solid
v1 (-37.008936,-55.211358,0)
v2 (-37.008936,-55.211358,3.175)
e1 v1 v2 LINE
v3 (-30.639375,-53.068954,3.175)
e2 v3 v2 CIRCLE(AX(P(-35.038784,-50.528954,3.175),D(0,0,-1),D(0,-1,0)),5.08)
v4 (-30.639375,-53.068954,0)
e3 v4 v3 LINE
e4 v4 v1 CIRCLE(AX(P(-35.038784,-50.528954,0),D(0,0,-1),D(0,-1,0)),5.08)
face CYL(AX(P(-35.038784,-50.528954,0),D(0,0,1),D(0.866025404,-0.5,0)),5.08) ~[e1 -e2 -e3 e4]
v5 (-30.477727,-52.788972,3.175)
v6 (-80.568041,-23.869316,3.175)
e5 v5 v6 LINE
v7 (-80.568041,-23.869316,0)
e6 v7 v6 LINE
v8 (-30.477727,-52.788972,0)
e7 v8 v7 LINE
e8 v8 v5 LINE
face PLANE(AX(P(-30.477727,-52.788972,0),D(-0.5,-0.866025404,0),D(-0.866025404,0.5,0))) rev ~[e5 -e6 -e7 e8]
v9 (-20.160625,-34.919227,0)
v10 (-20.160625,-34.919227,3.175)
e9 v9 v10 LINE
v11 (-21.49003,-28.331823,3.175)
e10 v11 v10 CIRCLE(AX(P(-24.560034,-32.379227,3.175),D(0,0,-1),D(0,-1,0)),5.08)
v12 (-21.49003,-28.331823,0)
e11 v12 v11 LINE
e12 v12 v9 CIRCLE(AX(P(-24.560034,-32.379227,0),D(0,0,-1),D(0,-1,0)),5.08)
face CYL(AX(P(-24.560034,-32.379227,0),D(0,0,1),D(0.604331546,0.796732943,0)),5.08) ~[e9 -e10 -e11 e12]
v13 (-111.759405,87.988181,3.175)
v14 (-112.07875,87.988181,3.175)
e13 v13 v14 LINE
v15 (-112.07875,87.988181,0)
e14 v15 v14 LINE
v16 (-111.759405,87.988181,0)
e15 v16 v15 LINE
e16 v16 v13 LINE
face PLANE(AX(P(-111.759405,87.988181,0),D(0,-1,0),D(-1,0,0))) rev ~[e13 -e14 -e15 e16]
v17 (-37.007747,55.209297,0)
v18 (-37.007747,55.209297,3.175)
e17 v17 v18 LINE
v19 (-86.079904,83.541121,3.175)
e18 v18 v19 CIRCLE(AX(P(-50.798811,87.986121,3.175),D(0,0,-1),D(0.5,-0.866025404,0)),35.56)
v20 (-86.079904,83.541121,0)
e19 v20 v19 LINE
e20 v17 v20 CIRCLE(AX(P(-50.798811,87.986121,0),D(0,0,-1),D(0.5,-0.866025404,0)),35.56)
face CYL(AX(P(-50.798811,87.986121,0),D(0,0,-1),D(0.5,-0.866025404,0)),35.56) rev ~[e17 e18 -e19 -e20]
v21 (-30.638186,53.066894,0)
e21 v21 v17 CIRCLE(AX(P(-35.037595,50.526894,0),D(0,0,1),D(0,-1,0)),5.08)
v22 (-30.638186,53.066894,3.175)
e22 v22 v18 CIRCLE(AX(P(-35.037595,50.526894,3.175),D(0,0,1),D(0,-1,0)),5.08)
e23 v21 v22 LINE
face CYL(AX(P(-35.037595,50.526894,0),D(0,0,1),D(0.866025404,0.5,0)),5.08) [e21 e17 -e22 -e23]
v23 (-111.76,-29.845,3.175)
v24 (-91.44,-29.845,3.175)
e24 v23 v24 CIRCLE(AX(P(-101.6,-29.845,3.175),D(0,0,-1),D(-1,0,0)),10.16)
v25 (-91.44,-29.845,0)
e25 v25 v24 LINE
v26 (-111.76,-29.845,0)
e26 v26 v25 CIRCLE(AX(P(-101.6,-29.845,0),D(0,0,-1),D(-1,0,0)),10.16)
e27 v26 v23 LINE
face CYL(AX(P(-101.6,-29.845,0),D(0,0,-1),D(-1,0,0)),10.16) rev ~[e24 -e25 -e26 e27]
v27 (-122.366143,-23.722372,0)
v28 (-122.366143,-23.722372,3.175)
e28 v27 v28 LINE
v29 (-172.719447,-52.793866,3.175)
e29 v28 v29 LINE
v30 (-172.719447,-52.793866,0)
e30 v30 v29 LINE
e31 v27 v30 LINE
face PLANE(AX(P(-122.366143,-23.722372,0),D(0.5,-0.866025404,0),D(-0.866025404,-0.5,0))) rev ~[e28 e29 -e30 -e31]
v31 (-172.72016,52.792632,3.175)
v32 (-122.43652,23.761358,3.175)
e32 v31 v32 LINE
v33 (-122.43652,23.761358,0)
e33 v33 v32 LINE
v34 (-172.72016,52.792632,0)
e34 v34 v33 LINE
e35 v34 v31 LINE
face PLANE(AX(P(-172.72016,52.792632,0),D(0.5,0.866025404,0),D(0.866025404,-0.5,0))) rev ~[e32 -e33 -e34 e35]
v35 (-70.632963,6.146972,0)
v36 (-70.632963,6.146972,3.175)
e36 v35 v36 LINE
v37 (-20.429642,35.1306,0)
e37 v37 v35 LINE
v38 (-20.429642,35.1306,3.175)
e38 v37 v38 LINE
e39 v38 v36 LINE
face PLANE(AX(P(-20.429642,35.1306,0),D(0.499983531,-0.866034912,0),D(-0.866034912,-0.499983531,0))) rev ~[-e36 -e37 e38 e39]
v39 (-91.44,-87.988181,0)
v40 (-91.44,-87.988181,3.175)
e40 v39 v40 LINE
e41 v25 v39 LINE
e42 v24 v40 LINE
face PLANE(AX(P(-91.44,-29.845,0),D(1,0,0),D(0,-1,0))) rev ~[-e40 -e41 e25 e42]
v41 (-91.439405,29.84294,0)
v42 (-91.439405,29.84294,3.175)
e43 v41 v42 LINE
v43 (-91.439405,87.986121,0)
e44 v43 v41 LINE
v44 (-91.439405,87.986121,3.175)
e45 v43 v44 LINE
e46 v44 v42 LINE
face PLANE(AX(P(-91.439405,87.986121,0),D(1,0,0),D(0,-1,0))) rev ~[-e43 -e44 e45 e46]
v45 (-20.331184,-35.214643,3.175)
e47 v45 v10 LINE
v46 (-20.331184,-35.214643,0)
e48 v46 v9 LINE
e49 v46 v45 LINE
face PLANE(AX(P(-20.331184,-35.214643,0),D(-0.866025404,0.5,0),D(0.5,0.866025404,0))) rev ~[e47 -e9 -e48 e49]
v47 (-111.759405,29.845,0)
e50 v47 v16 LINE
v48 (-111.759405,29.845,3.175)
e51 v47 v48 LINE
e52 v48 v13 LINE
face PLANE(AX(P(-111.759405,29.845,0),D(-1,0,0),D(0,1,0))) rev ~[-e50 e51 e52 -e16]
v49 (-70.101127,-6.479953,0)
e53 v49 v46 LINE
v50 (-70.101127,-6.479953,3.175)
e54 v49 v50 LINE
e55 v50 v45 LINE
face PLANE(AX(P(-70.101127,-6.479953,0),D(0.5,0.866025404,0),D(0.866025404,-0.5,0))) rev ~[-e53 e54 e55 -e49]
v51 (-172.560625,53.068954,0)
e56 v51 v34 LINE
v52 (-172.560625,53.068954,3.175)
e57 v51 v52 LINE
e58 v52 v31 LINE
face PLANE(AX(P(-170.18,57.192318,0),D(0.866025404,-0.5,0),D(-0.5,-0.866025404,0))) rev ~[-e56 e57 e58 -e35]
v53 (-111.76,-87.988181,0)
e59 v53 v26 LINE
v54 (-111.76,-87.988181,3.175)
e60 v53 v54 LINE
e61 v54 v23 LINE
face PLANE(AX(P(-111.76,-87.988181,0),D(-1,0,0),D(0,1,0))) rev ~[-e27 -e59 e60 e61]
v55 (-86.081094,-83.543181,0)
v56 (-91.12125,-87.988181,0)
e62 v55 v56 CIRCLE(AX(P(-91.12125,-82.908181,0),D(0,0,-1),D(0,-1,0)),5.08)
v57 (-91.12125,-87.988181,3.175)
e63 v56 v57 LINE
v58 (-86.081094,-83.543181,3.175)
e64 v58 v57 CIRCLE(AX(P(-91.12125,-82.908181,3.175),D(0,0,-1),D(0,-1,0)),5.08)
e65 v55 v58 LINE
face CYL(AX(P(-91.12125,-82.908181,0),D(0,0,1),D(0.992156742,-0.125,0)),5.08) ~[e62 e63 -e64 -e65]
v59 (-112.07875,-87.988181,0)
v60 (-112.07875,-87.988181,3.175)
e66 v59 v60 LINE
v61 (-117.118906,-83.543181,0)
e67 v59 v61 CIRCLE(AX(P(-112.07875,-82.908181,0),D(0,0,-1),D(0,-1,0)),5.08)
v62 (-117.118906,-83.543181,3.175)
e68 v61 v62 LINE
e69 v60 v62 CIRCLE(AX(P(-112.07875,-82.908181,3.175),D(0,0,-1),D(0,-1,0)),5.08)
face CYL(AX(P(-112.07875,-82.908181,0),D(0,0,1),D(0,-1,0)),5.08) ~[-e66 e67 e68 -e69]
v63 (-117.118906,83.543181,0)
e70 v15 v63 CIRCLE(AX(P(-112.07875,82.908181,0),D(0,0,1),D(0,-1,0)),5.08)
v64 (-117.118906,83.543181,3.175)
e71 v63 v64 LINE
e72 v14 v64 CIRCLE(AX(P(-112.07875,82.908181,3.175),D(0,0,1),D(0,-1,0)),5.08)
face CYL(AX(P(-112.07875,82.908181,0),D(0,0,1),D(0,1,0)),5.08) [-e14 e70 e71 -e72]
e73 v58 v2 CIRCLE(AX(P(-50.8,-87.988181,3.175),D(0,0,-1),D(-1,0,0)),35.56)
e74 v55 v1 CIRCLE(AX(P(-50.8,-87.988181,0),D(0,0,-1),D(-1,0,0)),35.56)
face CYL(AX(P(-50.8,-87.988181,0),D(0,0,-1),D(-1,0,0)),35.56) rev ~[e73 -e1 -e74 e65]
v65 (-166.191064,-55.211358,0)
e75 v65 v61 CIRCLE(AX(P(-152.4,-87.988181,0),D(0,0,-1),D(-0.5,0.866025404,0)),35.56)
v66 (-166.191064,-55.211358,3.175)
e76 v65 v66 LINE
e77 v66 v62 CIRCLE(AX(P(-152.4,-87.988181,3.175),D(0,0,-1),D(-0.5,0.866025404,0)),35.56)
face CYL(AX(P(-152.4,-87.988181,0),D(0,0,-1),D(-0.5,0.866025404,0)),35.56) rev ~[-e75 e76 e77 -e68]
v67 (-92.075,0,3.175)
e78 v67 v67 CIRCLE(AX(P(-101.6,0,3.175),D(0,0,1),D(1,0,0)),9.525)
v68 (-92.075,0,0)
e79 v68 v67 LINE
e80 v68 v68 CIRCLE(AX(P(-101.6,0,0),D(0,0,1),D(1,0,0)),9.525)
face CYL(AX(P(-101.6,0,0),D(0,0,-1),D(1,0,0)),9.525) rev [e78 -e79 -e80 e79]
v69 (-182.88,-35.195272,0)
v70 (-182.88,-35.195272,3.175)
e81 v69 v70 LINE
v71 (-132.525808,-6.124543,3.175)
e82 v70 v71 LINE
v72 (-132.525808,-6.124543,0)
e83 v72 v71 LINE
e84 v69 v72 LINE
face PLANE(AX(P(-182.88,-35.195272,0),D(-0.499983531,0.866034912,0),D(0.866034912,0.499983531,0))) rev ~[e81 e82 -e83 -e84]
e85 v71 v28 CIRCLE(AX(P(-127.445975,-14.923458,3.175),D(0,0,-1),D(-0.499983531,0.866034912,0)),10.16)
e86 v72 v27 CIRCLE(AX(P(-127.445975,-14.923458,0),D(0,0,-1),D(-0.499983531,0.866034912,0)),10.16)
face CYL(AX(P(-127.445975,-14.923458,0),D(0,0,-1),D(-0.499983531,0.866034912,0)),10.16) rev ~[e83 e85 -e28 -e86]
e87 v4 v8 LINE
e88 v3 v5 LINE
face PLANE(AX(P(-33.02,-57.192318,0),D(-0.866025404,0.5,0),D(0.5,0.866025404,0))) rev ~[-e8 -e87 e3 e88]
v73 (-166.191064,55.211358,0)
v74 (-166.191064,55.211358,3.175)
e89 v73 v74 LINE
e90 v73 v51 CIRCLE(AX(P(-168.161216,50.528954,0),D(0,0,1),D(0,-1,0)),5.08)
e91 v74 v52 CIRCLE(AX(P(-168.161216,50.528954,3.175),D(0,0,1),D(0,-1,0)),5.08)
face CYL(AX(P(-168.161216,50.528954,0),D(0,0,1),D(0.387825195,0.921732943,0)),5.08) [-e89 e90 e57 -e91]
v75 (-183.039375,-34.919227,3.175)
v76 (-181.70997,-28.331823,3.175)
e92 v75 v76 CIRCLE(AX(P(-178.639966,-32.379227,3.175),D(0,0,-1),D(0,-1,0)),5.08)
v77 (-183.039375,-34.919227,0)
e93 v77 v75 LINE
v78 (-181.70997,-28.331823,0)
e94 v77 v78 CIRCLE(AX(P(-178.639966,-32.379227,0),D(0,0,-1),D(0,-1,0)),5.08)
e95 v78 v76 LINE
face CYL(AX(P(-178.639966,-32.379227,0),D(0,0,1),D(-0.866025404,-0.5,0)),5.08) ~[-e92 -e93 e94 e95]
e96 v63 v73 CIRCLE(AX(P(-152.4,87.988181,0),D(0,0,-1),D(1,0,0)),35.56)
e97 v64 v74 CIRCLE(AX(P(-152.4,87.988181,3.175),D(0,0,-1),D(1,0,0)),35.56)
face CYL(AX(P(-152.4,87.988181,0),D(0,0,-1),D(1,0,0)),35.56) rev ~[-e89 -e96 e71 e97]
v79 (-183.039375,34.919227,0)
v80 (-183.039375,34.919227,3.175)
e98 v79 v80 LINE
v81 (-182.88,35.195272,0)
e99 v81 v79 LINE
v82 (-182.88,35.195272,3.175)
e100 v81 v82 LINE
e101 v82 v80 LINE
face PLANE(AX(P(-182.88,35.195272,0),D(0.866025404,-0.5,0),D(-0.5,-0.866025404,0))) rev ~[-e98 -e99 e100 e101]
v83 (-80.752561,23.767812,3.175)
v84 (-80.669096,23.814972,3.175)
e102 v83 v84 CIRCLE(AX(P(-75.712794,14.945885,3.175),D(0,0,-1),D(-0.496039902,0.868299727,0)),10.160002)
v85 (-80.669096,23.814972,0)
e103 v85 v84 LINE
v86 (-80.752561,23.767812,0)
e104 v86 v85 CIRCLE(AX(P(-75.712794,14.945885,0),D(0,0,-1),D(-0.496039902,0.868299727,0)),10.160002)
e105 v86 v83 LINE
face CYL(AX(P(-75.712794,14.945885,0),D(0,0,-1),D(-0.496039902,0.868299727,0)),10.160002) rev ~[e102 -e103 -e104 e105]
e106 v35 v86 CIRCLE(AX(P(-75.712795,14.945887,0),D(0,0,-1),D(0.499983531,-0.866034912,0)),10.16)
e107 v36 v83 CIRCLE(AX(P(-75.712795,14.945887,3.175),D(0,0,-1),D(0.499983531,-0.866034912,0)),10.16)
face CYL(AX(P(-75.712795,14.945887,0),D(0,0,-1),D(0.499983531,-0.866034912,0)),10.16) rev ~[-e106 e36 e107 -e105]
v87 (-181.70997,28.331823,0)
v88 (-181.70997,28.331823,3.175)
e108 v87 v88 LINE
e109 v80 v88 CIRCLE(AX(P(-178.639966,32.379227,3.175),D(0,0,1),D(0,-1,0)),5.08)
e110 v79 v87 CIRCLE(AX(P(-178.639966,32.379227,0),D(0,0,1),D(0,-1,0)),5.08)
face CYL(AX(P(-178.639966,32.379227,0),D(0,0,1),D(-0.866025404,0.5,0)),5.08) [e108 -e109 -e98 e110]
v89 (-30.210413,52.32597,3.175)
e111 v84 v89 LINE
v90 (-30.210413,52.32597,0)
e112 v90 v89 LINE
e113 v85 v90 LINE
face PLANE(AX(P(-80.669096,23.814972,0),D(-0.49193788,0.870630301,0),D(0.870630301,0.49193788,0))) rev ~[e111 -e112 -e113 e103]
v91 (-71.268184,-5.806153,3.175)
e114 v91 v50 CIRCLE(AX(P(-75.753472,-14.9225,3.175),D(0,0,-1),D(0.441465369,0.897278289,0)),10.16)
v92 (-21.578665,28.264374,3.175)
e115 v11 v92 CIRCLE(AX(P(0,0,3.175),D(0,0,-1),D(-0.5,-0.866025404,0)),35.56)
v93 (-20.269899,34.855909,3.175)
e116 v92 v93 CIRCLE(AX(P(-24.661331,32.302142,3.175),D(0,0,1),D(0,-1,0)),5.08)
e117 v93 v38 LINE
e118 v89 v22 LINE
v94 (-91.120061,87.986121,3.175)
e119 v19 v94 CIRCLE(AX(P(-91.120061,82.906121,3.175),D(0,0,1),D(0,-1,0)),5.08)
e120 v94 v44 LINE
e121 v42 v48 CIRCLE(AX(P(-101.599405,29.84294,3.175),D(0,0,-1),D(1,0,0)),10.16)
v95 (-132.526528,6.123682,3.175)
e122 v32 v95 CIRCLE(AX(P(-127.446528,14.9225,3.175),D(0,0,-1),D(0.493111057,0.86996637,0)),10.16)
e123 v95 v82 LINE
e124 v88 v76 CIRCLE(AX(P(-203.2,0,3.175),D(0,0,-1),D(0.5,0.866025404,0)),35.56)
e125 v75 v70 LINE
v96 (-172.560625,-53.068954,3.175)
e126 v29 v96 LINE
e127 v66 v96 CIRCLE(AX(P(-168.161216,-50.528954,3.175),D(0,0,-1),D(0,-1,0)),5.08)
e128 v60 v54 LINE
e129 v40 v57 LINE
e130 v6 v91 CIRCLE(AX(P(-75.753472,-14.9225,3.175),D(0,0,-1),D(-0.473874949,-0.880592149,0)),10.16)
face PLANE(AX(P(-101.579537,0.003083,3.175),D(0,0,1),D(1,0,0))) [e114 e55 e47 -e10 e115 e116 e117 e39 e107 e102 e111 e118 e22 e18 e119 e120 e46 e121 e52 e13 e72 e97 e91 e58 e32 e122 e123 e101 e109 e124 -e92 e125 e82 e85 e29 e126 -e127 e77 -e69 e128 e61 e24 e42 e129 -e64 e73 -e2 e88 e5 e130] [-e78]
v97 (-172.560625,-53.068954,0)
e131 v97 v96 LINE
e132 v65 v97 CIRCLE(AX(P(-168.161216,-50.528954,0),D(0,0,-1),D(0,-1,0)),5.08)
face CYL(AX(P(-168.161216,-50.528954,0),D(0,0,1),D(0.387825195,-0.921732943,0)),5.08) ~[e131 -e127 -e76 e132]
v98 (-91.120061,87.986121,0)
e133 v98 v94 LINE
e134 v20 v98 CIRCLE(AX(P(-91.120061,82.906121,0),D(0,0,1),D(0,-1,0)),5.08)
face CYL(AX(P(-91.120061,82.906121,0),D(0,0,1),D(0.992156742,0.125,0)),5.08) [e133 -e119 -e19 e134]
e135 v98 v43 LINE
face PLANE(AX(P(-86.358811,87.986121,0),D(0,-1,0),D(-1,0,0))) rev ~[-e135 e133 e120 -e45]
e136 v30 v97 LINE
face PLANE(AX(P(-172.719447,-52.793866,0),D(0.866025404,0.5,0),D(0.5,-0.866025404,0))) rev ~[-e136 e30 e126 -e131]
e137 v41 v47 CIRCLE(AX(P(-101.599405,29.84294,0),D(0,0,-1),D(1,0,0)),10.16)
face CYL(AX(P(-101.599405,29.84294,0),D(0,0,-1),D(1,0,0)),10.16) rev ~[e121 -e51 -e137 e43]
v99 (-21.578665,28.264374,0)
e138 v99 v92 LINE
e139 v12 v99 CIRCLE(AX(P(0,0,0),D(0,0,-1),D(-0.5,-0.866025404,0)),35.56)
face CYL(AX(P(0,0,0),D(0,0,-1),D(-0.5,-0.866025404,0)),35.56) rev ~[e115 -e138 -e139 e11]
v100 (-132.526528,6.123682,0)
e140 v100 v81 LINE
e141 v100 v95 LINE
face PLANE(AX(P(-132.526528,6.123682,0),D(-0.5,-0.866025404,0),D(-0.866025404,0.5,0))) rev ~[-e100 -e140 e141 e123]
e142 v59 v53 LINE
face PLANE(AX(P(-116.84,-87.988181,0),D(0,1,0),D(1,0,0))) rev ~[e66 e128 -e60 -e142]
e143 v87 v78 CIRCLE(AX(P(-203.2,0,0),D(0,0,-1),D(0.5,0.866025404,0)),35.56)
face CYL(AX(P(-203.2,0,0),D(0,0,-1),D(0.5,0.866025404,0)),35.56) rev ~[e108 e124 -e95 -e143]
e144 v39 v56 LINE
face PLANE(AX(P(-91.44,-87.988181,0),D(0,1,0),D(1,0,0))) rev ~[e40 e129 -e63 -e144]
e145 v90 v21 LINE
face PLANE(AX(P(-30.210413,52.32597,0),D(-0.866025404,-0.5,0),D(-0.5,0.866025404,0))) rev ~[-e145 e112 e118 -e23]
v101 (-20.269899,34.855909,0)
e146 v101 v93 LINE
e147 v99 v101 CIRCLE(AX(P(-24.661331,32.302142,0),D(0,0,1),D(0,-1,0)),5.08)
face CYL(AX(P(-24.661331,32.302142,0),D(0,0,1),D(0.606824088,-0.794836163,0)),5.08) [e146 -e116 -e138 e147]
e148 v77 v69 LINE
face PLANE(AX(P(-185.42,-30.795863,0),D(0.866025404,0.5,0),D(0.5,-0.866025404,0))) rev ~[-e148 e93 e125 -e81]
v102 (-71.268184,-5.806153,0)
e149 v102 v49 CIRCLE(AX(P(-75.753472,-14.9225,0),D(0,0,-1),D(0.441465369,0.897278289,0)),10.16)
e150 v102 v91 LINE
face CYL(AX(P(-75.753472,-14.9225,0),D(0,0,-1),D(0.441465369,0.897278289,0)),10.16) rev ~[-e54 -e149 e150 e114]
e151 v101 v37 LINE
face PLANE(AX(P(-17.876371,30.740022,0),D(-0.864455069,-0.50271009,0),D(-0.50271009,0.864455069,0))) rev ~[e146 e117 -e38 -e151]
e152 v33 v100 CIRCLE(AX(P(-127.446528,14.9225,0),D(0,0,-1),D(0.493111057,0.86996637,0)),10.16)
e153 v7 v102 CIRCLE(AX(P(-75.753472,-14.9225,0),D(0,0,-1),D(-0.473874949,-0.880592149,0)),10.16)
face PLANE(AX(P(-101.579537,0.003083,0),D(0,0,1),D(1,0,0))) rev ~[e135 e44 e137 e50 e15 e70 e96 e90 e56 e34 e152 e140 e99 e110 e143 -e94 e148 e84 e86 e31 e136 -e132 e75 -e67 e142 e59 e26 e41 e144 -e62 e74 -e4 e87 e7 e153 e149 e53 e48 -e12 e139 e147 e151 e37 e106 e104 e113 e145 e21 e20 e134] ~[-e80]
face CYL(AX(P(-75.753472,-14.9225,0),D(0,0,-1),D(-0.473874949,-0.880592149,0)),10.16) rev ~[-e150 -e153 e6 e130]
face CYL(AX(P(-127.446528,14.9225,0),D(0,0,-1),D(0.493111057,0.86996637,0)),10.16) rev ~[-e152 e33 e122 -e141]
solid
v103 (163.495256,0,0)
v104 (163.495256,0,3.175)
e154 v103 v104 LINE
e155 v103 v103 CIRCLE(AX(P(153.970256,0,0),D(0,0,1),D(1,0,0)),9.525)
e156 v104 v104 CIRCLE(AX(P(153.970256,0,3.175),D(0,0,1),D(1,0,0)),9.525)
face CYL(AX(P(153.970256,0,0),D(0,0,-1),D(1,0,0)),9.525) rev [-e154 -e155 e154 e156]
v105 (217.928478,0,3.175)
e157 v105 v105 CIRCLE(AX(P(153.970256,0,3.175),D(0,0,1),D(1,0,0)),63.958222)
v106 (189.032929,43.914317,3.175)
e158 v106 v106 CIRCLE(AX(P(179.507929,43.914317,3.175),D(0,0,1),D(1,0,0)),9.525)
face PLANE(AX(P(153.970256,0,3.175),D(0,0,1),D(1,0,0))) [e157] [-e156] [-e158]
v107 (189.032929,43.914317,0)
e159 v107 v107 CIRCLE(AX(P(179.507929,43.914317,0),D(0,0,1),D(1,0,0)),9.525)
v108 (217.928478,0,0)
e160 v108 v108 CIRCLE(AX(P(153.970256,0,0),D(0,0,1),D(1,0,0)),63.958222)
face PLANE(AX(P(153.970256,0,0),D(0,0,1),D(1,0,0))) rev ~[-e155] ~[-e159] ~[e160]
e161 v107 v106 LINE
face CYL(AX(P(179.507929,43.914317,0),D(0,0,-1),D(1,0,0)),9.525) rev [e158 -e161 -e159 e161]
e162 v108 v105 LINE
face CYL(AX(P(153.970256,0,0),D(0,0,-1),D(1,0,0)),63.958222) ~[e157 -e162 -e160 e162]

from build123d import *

# Parameters (mm, degrees)
F0_R     = 9.525
F1_DEPTH = 3.175
F2_R     = 5.08
F0_R_2   = 63.9582216699
F0_R_3   = 33.02
F3_DEPTH = 3.175


# Not quite as in the source:
# - a length typed as a fraction of an inch, garbled in the dataset ("3 / 203.2 mm" for 3/8 in), is restored
# - a feature names something its author has since deleted; it is built from what else it names


with BuildPart() as f1:
    # F0 (on Top) → F1 (new body)
    with BuildSketch(Plane.XY):
        with BuildLine():
            ThreePointArc((-17.78, -30.7958633586), (-35.5599563921, -0.0556901267), (-17.8763707949, 30.7400222382))
            Line((-17.8763707949, 30.7400222382), (-20.4296415334, 35.1306001794))
            Line((-20.4296415334, 35.1306001794), (-70.6329627114, 6.1469720917))
            ThreePointArc((-70.6329627114, 6.1469720917), (-84.5232381264, 9.8860746707), (-80.7525608015, 23.7678120156))
            ThreePointArc((-80.7525608015, 23.7678120156), (-80.7108842522, 23.7914906594), (-80.6690964546, 23.8149724163))
            Line((-80.6690964546, 23.8149724163), (-30.2104125797, 52.3259695061))
            Line((-30.2104125797, 52.3259695061), (-33.0188105519, 57.1902574851))
            ThreePointArc((-33.0188105519, 57.1902574851), (-68.5788105527, 57.1902574837), (-86.3588105535, 87.9861208428))
            Line((-86.3588105535, 87.9861208428), (-91.4394053355, 87.9861208428))
            Line((-91.4394053355, 87.9861208428), (-91.4394053355, 29.8429398183))
            ThreePointArc((-91.4394053355, 29.8429398183), (-101.6004354264, 19.6829398705), (-111.7594051266, 29.845))
            Line((-111.7594051266, 29.845), (-111.7594051266, 87.9881810245))
            Line((-111.7594051266, 87.9881810245), (-116.84, 87.9881810245))
            ThreePointArc((-116.84, 87.9881810245), (-134.62, 57.1923176659), (-170.18, 57.1923176659))
            Line((-170.18, 57.1923176659), (-172.7201599914, 52.7926315014))
            Line((-172.7201599914, 52.7926315014), (-122.4365198362, 23.7613583219))
            ThreePointArc((-122.4365198362, 23.7613583219), (-118.627620527, 9.8774561073), (-132.5265281759, 6.1236818976))
            Line((-132.5265281759, 6.1236818976), (-182.88, 35.1952724098))
            Line((-182.88, 35.1952724098), (-185.42, 30.7958633586))
            ThreePointArc((-185.42, 30.7958633586), (-167.64, 0), (-185.42, -30.7958633586))
            Line((-185.42, -30.7958633586), (-182.8800000009, -35.1952724082))
            Line((-182.8800000009, -35.1952724082), (-132.5258080212, -6.1245428478))
            ThreePointArc((-132.5258080212, -6.1245428478), (-118.6470606402, -9.8436248763), (-122.3661426686, -23.7223722573))
            Line((-122.3661426686, -23.7223722573), (-172.7194471607, -52.7938661604))
            Line((-172.7194471607, -52.7938661604), (-170.18, -57.1923176659))
            ThreePointArc((-170.18, -57.1923176659), (-134.62, -57.1923176659), (-116.84, -87.9881810245))
            Line((-116.84, -87.9881810245), (-111.76, -87.9881810245))
            Line((-111.76, -87.9881810245), (-111.76, -29.845))
            ThreePointArc((-111.76, -29.845), (-101.6, -19.685), (-91.44, -29.845))
            Line((-91.44, -29.845), (-91.4399999997, -87.9881810245))
            Line((-91.4399999997, -87.9881810245), (-86.36, -87.9881810245))
            ThreePointArc((-86.36, -87.9881810245), (-68.58, -57.1923176659), (-33.02, -57.1923176659))
            Line((-33.02, -57.1923176659), (-30.4777274407, -52.7889724266))
            Line((-30.4777274407, -52.7889724266), (-80.5680413022, -23.8693162349))
            ThreePointArc((-80.5680413022, -23.8693162349), (-84.7865541797, -10.2717986383), (-71.2681836795, -5.8061525812))
            ThreePointArc((-71.2681836795, -5.8061525812), (-70.6734718241, -6.1236818976), (-70.1011274419, -6.4799528141))
            Line((-70.1011274419, -6.4799528141), (-20.3311837367, -35.2146432099))
            Line((-20.3311837367, -35.2146432099), (-17.78, -30.7958633586))
        make_face()
        with Locations((-101.6, 0)):
            Circle(F0_R, mode=Mode.SUBTRACT)
    extrude(amount=F1_DEPTH)

    # F2
    f2_edges = [f1.edges().sort_by_distance(p)[0] for p in [
        (-17.876371, 30.740022, 1.5875),
        (-17.78, -30.795863, 1.5875),
        (-33.02, -57.192318, 1.5875),
        (-86.36, -87.988181, 1.5875),
        (-116.84, -87.988181, 1.5875),
        (-170.18, -57.192318, 1.5875),
        (-185.42, -30.795863, 1.5875),
        (-185.42, 30.795863, 1.5875),
        (-116.84, 87.988181, 1.5875),
        (-86.358811, 87.986121, 1.5875),
        (-33.018811, 57.190257, 1.5875),
        (-170.18, 57.192318, 1.5875),
    ]]
    fillet(f2_edges, radius=F2_R)


with BuildPart() as f3:
    # F0 (on Top) → F3 (new body)
    with BuildSketch(Plane.XY):
        with Locations((153.9702564478, 0)):
            Circle(F0_R_2)
        with Locations((153.9702564478, 0)):
            Circle(F0_R_3, mode=Mode.SUBTRACT)
        with Locations((179.5079290119, 43.9143174831)):
            Circle(F0_R, mode=Mode.SUBTRACT)
        with Locations((153.9702564478, 0)):
            Circle(F0_R_3)
        with Locations((153.9702564478, 0)):
            Circle(F0_R, mode=Mode.SUBTRACT)
    extrude(amount=F3_DEPTH)


solid = Compound([f1.part, f3.part])
